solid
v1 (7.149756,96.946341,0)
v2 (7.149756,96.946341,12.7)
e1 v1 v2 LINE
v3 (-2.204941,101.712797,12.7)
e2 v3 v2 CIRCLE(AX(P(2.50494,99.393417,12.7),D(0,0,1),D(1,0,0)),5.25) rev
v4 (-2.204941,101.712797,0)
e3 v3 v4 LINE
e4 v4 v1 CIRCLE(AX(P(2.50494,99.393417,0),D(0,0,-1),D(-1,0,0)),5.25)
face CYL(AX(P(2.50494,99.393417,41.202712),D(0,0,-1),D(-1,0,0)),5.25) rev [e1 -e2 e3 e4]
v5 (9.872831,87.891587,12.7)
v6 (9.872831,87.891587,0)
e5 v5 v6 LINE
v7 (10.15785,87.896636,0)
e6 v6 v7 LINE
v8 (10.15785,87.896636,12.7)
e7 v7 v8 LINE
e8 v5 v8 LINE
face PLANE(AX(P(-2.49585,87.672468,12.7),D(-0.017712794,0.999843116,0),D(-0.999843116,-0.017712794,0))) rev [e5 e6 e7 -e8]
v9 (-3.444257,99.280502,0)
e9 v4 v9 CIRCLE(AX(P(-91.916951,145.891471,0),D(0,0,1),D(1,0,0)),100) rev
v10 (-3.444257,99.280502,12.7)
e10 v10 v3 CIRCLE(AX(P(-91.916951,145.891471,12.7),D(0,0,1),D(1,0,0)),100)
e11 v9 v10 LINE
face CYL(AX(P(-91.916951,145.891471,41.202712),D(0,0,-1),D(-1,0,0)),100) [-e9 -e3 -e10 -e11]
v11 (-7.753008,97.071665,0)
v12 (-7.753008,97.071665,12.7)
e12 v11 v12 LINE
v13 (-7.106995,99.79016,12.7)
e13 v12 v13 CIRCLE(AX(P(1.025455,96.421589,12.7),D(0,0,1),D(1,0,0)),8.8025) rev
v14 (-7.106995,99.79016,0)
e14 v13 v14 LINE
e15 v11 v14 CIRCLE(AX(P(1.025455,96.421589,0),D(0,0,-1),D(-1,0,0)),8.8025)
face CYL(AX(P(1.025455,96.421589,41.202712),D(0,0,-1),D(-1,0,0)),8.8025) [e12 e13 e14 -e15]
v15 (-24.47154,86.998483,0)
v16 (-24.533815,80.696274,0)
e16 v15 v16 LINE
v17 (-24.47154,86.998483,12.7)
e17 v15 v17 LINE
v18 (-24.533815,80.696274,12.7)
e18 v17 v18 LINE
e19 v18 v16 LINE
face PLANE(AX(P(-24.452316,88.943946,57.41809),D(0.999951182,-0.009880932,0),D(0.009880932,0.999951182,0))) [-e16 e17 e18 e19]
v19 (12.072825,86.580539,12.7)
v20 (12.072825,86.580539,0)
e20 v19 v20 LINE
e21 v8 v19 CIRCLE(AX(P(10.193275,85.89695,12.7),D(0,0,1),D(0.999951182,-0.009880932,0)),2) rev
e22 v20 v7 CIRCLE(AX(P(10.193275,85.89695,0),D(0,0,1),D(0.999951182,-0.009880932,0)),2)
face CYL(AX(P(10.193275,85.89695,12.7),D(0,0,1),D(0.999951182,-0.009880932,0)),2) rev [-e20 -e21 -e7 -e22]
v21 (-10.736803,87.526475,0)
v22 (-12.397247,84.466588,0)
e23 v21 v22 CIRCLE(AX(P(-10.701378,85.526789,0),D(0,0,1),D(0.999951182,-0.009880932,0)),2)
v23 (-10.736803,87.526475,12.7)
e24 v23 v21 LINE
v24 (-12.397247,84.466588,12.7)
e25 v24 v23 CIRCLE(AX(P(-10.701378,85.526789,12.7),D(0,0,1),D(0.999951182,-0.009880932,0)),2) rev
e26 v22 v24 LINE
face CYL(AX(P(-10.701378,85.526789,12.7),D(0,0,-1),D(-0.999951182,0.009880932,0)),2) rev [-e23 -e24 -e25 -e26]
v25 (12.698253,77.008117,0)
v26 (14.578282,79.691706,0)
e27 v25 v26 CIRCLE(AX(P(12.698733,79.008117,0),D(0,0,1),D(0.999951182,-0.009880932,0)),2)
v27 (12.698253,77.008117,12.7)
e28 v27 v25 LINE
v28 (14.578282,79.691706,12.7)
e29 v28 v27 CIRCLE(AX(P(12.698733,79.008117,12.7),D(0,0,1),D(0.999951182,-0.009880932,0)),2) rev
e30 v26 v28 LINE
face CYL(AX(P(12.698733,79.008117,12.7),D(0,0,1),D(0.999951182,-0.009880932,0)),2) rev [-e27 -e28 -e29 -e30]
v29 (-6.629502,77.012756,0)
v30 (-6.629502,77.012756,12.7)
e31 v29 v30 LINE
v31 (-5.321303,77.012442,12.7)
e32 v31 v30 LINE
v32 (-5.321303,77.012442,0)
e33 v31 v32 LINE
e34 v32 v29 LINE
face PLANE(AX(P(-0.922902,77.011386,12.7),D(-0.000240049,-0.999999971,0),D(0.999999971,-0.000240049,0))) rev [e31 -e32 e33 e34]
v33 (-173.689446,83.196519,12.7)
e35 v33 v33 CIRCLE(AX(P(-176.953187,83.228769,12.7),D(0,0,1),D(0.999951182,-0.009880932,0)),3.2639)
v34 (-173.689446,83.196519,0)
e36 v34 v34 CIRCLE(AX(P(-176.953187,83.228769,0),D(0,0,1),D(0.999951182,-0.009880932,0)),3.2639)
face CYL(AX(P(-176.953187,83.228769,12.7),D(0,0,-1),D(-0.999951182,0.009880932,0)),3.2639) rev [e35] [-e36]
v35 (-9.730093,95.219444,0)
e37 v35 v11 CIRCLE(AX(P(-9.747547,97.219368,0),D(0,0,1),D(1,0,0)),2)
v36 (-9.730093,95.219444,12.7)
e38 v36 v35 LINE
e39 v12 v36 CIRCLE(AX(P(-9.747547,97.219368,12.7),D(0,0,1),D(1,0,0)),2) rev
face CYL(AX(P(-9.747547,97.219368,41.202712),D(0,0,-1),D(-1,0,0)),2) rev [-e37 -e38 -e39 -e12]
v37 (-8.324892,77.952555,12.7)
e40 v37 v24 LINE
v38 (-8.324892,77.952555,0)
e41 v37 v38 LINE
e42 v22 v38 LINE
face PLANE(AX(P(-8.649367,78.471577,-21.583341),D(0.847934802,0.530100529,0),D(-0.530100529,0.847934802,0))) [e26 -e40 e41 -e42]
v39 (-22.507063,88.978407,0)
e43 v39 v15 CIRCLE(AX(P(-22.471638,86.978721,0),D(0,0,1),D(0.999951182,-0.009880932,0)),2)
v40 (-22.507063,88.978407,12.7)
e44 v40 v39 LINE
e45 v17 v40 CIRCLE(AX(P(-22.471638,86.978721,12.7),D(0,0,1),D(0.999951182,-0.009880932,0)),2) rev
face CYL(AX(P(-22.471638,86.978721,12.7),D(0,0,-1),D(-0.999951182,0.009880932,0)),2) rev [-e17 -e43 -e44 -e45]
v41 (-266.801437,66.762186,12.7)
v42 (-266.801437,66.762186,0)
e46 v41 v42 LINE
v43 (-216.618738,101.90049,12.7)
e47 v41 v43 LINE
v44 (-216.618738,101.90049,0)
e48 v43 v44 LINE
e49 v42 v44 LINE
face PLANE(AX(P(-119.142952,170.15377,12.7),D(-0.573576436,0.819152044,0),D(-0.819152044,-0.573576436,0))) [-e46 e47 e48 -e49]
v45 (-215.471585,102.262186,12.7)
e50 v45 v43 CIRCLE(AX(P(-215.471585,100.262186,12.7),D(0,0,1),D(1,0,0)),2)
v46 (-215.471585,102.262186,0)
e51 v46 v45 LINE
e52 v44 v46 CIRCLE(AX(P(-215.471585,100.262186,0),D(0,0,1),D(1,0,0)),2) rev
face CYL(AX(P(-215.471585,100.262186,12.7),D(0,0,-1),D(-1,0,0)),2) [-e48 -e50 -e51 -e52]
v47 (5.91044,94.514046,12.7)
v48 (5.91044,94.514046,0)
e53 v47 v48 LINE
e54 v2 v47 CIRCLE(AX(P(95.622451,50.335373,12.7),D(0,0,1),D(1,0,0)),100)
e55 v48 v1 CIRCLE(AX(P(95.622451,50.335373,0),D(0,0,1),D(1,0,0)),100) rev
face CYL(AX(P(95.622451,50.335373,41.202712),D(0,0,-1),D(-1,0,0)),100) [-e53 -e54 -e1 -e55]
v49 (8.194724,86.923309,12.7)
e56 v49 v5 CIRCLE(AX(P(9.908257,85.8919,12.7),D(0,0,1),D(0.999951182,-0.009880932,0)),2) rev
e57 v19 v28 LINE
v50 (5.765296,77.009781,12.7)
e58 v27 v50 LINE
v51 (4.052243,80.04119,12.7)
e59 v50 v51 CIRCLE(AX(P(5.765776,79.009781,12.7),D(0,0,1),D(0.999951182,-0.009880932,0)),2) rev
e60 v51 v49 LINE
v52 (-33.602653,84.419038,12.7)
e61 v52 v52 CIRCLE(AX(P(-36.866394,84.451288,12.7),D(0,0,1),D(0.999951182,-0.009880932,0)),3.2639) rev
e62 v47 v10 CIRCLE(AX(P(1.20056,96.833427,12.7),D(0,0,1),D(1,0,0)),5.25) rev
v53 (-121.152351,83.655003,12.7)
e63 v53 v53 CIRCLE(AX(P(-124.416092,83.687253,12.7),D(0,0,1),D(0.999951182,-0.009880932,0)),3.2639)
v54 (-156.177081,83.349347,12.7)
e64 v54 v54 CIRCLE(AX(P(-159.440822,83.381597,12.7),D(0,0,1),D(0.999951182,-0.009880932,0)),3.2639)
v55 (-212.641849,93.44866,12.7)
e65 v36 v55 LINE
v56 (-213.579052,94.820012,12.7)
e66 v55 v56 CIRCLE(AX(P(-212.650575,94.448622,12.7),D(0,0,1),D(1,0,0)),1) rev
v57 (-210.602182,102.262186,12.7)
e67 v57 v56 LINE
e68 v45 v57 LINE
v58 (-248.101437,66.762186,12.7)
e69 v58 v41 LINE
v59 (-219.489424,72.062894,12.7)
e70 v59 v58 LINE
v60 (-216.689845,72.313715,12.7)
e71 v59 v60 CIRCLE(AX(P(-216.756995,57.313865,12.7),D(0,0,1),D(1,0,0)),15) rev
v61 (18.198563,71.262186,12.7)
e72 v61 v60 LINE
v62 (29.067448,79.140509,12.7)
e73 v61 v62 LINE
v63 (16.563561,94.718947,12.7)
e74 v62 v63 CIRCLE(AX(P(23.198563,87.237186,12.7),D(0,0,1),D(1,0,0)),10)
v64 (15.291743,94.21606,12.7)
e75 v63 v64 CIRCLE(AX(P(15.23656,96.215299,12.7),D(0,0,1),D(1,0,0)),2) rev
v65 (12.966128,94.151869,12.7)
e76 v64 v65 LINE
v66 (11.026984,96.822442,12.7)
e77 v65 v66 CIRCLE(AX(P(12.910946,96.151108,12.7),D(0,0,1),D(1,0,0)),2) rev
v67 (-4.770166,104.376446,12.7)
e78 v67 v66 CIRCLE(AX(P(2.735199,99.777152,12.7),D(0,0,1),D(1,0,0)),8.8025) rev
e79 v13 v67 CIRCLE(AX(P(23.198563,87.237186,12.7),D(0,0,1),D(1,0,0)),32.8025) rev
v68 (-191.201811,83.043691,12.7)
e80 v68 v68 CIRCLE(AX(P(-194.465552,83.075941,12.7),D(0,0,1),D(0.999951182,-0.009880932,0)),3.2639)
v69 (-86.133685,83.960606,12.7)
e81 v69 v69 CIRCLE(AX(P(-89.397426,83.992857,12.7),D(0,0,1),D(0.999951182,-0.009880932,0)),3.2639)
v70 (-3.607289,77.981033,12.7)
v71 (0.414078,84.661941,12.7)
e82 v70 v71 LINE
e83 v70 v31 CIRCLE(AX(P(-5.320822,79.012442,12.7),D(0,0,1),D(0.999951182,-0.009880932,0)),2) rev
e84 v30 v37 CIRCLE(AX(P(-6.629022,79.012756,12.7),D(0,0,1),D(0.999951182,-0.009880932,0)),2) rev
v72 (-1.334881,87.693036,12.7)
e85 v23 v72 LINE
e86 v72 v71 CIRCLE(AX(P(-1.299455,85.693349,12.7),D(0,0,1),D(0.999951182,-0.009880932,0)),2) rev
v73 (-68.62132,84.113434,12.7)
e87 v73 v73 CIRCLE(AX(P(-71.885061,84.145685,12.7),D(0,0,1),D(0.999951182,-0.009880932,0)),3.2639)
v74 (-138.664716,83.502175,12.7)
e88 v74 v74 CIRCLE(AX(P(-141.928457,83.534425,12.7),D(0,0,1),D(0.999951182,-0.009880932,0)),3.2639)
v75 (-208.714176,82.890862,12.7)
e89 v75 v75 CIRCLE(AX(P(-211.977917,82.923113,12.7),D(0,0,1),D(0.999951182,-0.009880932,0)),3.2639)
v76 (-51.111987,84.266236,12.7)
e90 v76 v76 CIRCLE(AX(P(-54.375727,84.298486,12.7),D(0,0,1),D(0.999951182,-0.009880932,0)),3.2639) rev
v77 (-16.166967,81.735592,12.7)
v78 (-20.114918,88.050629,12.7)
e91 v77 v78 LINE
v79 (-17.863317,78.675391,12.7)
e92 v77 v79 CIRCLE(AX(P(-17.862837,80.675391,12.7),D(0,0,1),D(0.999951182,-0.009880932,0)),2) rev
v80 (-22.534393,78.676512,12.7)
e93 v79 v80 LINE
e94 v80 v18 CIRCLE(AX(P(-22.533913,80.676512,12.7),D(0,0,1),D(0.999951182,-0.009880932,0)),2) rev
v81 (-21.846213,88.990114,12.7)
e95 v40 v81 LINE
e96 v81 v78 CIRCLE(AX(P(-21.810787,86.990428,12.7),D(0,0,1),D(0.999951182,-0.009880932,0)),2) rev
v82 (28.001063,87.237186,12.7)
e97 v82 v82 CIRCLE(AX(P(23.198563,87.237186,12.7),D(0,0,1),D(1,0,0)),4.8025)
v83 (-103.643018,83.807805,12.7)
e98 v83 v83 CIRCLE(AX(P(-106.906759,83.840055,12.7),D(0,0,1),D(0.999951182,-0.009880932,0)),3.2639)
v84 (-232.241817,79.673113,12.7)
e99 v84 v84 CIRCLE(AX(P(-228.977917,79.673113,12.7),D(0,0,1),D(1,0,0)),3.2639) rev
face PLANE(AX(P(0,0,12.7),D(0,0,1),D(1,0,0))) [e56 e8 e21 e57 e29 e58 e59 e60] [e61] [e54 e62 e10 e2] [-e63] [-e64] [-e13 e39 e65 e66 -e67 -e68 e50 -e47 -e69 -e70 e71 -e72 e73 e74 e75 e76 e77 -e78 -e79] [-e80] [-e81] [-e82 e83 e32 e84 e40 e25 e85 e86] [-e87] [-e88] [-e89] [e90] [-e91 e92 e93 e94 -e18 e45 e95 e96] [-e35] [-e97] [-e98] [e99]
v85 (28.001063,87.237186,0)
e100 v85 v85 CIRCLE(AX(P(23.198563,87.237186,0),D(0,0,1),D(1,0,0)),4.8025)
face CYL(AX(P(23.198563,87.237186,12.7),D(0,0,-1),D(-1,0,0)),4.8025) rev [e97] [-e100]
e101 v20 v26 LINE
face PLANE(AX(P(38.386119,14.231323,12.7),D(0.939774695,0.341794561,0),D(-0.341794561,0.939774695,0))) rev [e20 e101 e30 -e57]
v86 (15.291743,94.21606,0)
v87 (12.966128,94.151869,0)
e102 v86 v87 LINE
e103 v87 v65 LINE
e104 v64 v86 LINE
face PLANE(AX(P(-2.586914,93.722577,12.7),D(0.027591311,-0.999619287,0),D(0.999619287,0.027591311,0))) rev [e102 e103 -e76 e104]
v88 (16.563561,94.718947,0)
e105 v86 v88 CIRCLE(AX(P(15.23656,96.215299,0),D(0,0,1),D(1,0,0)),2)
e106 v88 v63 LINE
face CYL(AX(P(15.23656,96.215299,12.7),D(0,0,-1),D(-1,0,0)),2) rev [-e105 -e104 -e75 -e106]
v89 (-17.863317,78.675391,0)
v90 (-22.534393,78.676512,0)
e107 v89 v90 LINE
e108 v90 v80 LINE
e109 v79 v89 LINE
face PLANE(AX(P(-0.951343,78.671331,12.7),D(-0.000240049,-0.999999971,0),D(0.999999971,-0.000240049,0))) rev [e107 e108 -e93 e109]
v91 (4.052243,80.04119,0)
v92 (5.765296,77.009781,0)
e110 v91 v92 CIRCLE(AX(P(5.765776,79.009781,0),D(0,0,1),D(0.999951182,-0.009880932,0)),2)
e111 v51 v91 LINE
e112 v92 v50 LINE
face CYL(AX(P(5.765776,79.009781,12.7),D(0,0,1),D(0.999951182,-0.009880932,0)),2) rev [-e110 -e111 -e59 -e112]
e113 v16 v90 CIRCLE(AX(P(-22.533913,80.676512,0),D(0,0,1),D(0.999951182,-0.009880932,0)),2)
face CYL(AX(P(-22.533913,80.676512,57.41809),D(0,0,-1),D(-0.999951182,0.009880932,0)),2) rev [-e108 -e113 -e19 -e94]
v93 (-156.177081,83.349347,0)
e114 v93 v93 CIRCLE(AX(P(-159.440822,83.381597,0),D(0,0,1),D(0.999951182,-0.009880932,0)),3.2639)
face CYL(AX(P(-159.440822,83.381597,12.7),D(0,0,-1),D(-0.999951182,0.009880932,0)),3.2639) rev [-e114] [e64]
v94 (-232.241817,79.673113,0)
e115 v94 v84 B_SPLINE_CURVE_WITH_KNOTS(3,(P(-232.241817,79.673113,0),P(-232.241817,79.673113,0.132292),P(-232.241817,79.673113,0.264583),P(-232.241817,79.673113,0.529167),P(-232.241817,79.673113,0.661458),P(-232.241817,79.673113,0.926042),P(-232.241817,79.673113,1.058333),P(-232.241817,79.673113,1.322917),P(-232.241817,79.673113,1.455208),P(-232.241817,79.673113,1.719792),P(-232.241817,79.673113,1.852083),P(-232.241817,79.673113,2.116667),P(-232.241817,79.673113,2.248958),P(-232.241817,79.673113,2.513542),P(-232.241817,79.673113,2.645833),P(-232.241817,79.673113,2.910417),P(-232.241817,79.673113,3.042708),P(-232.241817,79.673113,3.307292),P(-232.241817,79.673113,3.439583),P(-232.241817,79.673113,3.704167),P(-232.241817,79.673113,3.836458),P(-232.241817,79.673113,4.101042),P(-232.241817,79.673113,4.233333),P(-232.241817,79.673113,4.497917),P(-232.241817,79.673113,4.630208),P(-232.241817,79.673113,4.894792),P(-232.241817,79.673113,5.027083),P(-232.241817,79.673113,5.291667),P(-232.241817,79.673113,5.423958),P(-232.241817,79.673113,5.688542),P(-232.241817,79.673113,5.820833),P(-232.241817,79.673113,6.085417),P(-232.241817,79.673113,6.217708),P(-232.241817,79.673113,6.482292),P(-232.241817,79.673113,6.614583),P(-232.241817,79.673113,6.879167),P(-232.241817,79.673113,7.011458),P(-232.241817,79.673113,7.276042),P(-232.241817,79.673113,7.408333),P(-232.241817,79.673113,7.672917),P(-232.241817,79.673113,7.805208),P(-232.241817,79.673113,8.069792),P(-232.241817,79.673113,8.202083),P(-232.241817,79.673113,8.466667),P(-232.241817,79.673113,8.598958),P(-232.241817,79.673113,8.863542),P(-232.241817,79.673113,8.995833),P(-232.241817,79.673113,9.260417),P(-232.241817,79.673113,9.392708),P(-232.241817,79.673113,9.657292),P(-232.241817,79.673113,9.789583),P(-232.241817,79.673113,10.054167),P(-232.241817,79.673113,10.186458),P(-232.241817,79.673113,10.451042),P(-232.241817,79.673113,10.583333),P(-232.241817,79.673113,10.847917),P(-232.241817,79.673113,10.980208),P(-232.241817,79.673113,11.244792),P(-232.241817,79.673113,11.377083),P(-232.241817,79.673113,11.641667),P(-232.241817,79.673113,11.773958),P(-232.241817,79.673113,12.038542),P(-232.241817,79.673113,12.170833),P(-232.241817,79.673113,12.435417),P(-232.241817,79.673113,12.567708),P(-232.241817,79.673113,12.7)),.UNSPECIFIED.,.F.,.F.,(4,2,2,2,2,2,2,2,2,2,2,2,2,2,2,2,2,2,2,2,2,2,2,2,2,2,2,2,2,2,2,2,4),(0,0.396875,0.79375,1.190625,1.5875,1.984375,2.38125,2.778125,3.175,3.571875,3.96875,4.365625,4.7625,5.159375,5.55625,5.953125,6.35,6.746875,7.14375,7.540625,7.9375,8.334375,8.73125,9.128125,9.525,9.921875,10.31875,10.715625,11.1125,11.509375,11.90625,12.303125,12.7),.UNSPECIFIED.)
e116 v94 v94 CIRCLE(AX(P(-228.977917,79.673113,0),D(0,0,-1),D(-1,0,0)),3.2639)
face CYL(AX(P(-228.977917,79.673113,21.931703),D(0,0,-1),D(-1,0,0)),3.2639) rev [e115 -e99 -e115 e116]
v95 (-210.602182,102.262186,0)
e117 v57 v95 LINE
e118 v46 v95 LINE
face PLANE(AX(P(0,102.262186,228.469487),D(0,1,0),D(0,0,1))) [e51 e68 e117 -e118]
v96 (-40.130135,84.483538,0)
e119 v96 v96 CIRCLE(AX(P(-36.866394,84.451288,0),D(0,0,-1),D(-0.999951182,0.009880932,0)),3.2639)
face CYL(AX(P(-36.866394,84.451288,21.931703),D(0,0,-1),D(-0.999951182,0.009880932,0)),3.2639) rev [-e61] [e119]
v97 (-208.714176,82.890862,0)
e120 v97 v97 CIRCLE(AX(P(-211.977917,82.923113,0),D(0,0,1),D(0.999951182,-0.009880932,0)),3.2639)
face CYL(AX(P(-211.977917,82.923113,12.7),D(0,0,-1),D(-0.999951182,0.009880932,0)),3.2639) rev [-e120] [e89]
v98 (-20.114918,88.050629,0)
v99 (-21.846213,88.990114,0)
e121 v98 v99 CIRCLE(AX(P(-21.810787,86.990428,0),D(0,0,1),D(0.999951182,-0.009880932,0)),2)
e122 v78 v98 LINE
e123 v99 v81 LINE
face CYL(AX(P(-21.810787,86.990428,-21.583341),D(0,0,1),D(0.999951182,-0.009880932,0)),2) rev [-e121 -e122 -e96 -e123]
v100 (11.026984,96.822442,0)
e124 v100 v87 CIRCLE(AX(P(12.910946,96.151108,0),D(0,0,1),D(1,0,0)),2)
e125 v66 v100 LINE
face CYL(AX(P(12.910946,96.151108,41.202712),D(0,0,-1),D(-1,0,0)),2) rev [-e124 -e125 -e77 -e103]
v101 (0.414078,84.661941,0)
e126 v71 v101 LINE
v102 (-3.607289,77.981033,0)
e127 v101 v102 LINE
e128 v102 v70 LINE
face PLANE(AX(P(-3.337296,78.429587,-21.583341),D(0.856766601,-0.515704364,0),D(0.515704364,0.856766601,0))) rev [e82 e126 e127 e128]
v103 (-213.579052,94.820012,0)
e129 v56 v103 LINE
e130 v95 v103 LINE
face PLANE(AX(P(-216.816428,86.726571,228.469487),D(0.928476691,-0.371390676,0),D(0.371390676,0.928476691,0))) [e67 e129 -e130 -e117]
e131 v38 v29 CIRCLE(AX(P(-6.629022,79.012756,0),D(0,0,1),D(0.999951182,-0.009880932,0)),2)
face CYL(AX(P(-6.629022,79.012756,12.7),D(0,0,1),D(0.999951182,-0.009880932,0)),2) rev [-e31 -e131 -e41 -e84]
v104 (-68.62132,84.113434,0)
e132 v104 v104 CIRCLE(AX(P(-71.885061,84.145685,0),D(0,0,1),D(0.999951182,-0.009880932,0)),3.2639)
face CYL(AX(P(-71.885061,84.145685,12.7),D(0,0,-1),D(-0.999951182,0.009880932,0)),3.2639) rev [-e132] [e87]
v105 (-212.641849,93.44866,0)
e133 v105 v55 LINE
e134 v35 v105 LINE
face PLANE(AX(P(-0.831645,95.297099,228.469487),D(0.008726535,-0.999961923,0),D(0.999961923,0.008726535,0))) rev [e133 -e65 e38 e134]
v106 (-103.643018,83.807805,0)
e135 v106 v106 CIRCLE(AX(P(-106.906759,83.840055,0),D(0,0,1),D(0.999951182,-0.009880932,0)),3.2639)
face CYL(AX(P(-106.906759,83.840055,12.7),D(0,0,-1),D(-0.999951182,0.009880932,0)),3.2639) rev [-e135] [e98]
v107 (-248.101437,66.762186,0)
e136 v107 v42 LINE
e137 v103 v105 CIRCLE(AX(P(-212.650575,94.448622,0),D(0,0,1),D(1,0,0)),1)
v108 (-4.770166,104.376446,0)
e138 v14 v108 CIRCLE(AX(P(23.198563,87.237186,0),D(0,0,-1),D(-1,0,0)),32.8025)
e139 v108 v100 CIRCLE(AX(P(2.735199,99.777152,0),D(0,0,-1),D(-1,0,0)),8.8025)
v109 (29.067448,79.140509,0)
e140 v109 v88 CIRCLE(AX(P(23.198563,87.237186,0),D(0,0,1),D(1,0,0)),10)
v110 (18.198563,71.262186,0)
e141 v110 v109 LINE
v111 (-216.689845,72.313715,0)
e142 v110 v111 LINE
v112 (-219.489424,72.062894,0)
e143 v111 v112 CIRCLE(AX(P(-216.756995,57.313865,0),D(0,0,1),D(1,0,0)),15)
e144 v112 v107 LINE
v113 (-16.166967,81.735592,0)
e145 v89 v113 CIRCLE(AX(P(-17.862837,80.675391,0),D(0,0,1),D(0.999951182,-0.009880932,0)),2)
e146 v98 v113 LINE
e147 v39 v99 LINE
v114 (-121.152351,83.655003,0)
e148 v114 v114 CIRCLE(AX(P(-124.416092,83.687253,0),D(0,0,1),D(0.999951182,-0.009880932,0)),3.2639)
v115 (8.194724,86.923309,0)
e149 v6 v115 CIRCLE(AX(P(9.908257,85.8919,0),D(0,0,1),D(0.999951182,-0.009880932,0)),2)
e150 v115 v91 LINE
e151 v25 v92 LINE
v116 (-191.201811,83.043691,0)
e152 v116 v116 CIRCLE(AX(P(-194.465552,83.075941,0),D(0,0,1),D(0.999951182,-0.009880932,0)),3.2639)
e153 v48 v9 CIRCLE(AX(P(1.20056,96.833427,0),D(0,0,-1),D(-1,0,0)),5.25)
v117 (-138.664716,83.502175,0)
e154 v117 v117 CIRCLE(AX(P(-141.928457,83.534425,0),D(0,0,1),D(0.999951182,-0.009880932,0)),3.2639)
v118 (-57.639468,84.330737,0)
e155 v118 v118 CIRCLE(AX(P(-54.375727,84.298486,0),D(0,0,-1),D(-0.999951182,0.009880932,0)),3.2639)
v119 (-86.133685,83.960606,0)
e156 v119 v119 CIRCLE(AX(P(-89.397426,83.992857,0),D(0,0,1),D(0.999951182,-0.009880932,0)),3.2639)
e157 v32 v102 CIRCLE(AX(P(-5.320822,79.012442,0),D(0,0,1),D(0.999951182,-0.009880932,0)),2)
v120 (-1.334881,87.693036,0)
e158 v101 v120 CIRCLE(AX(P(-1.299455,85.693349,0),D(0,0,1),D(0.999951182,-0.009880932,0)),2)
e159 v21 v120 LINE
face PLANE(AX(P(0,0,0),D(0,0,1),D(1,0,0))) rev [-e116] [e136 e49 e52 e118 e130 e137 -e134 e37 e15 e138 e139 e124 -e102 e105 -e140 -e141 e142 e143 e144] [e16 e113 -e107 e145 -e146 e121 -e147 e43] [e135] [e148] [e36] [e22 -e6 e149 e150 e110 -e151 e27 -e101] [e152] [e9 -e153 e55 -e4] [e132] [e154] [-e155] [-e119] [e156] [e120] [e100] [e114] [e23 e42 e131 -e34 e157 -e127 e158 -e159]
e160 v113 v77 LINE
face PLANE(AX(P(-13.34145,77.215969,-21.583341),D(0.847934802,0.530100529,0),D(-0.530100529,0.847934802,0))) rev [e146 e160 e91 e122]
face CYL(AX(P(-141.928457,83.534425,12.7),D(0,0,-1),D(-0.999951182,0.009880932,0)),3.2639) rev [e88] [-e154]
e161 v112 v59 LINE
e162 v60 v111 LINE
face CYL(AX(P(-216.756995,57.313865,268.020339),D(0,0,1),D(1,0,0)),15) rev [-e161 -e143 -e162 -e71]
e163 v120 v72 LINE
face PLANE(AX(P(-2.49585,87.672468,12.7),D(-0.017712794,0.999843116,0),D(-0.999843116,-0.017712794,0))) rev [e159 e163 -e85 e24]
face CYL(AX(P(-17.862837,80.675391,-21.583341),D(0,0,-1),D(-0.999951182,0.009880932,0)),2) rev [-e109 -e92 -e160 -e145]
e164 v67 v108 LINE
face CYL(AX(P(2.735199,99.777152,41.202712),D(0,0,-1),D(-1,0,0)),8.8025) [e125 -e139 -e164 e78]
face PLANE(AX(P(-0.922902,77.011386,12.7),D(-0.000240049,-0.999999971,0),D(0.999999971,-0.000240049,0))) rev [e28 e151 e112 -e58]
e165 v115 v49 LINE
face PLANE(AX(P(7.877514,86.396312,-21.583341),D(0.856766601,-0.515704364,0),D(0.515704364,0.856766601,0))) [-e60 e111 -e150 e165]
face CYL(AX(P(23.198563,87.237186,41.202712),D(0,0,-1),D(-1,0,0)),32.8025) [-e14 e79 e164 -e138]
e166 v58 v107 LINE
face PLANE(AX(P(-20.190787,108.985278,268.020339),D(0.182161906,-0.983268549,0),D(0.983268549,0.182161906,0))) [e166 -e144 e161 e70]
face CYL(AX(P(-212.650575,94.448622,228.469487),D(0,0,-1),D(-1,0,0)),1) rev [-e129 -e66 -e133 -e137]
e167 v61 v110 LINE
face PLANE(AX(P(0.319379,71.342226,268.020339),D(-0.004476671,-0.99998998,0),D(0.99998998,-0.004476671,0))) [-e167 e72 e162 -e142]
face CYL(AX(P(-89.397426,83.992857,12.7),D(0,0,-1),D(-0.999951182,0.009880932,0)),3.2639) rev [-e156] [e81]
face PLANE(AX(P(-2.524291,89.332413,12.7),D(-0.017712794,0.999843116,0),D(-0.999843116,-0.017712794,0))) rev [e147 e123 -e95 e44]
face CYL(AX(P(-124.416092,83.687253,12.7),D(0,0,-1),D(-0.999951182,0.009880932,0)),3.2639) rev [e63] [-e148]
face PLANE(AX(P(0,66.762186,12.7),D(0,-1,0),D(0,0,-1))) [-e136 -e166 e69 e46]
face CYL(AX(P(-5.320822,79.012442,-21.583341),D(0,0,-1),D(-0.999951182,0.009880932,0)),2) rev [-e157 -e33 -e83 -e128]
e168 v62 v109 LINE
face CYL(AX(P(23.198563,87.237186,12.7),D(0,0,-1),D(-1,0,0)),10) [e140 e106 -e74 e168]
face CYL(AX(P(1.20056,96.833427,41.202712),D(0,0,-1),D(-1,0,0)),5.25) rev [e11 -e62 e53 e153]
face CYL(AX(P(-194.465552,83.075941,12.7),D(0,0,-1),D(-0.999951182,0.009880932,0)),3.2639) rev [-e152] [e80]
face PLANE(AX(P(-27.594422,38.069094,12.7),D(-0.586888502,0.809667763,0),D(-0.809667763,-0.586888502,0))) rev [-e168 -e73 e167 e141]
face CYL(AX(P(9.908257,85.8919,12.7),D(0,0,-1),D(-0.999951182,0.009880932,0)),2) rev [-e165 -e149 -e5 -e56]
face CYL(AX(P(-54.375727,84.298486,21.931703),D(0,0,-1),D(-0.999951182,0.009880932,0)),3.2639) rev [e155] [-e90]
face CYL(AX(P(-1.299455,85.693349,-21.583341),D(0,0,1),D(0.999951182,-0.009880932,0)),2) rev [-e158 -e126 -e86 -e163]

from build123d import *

# Parameters (mm, degrees)
SKETCH1_R           = 3.2639
SKETCH1_R_2         = 4.8025
BOSS_EXTRUDE1_DEPTH = 12.7
EXTRUDE_THIN1_DEPTH = 12.7
FILLET6_R           = 2
FILLET3_R           = 1
FILLET4_R           = 2
BOSS_EXTRUDE5_DEPTH = 12.7
CUT_EXTRUDE8_DEPTH  = 12.7
FILLET13_R          = 100
FILLET14_R          = 2
CUT_EXTRUDE9_DEPTH  = 12.7
FILLET16_R          = 2
BOSS_EXTRUDE6_DEPTH = 12.7
SKETCH18_R          = 3.2639
CUT_EXTRUDE10_DEPTH = 12.7
FILLET17_R          = 2
CUT_EXTRUDE11_DEPTH = 12.7
BOSS_EXTRUDE7_START = -12.7
BOSS_EXTRUDE7_DEPTH = 12.7
DELETEFACE1_DEPTH   = 12.7
MOVE_FACE1_DEPTH    = 12.7
MOVE_FACE1_2_DEPTH  = 12.7
MOVE_FACE2_DEPTH    = 12.7
MOVE_FACE2_2_DEPTH  = 12.7
SKETCH27_R          = 3.2639
CUT_EXTRUDE12_DEPTH = 12.7
FILLET18_R          = 15
FILLET19_R          = 1
FILLET20_R          = 2
MOVE_FACE3_DEPTH    = 12.7
MOVE_FACE3_2_DEPTH  = 12.7
FILLET21_R          = 2


# Read off the part's stored shape, not the designer's step: DeleteFace1, Move Face1, Move Face2, Move Face3
with BuildPart() as part:
    # Sketch1 → Boss-Extrude1 (new body)
    with BuildSketch(Plane.XY):
        with BuildLine():
            Line((-266.801436578, 66.762186411), (-251.101436578, 66.762186411))
            Line((-251.101436578, 66.762186411), (-241.101436578, 68.762186411))
            Line((-241.101436578, 68.762186411), (18.198563422, 71.262186411))
            Line((18.198563422, 71.262186411), (29.067448443, 79.140508783))
            ThreePointArc((29.067448443, 79.140508783), (30.773671377, 93.765412775), (16.057134994, 94.237186411))
            Line((16.057134994, 94.237186411), (-218.528848369, 87.762186411))
            Line((-218.528848369, 87.762186411), (-214.528848369, 97.762186411))
            Line((-214.528848369, 97.762186411), (-222.528848369, 97.762186411))
            Line((-222.528848369, 97.762186411), (-266.801436578, 66.762186411))
        make_face()
        with Locations((-211.801436578, 78.496276476)):
            Circle(SKETCH1_R, mode=Mode.SUBTRACT)
        with BuildLine():
            ThreePointArc((-197.554771535, 78.761405302), (-194.352166872, 82.085470554), (-191.028101621, 78.882865891))
            ThreePointArc((-191.028101621, 78.882865891), (-194.230706283, 75.55880064), (-197.554771535, 78.761405302))
        make_face(mode=Mode.SUBTRACT)
        with BuildLine():
            ThreePointArc((-180.044771535, 79.087264423), (-176.842166872, 82.411329675), (-173.518101621, 79.208725013))
            ThreePointArc((-173.518101621, 79.208725013), (-176.720706283, 75.884659761), (-180.044771535, 79.087264423))
        make_face(mode=Mode.SUBTRACT)
        with BuildLine():
            ThreePointArc((-162.534771535, 79.413123544), (-159.332166872, 82.737188796), (-156.008101621, 79.534584134))
            ThreePointArc((-156.008101621, 79.534584134), (-159.210706283, 76.210518882), (-162.534771535, 79.413123544))
        make_face(mode=Mode.SUBTRACT)
        with BuildLine():
            ThreePointArc((-145.024771535, 79.738982665), (-141.822166872, 83.063047917), (-138.498101621, 79.860443255))
            ThreePointArc((-138.498101621, 79.860443255), (-141.700706283, 76.536378003), (-145.024771535, 79.738982665))
        make_face(mode=Mode.SUBTRACT)
        with Locations((-124.251436578, 80.125572081)):
            Circle(SKETCH1_R, mode=Mode.SUBTRACT)
        with Locations((-106.744467891, 80.45137479)):
            Circle(SKETCH1_R, mode=Mode.SUBTRACT)
        with Locations((-89.237499204, 80.777177499)):
            Circle(SKETCH1_R, mode=Mode.SUBTRACT)
        with Locations((-71.727499204, 81.10303662)):
            Circle(SKETCH1_R, mode=Mode.SUBTRACT)
        with BuildLine():
            ThreePointArc((-56.754762895, 76.539814612), (-61.641816892, 81.290680691), (-56.935012167, 86.220185184))
            Line((-56.935012167, 86.220185184), (11.656299, 88.113430183))
            Line((11.656299, 88.113430183), (15.733532107, 77.238699061))
            Line((15.733532107, 77.238699061), (-56.754762895, 76.539814612))
        make_face(mode=Mode.SUBTRACT)
        with Locations((23.198563422, 87.237186411)):
            Circle(SKETCH1_R_2, mode=Mode.SUBTRACT)
    extrude(amount=BOSS_EXTRUDE1_DEPTH)

    # Sketch3 → Extrude-Thin1 (add)
    with BuildSketch(Plane.XY.offset(12.7)):
        Polygon((4.238515695, 91.06458037), (3.224088624, 89.340939538), (-3.171442721, 78.474116994), (-4.185869793, 76.750476162), (0.554142495, 73.960801716), (1.568569566, 75.684442548), (7.964100911, 86.551265092), (8.978527982, 88.274905924), align=None)
        Polygon((-7.406763076, 76.778305642), (-8.483669151, 78.463616684), (-15.08355213, 88.792145717), (-16.160458205, 90.477456759), (-20.795063569, 87.515965054), (-19.718157494, 85.830654012), (-13.118274515, 75.502124979), (-12.04136844, 73.816813937), align=None)
        Polygon((-55.789995158, 86.920345113), (-54.713089083, 85.235034072), (-48.113206103, 74.906505038), (-47.036300029, 73.221193997), (-42.401694665, 76.182685702), (-43.478600739, 77.867996743), (-50.078483719, 88.196525777), (-51.155389794, 89.881836818), align=None)
        Polygon((-30.756415894, 90.46896043), (-31.770842965, 88.745319598), (-38.16637431, 77.878497054), (-39.180801381, 76.154856222), (-34.440789094, 73.365181776), (-33.426362022, 75.088822608), (-27.030830678, 85.955645152), (-26.016403606, 87.679285984), align=None)
    extrude(amount=-EXTRUDE_THIN1_DEPTH)

    # Fillet6
    fillet6_edges = [part.edges().sort_by_distance(p)[0] for p in [
        (-7.55746183, 77.014142621, 6.35),
        (-14.193924314, 87.399916982, 6.35),
        (-38.852657232, 76.712414937, 6.35),
        (-32.865984778, 86.884534137, 6.35),
        (-32.434398171, 76.774295568, 6.35),
        (-26.378761772, 87.063593296, 6.35),
        (-49.203405679, 76.61261983, 6.35),
        (-55.370195509, 86.263376972, 6.35),
        (-42.716385675, 76.675163409, 6.35),
        (-48.956334512, 86.440411206, 6.35),
        (15.733532107, 77.238699061, 6.35),
        (11.656299, 88.113430183, 6.35),
        (-4.010566108, 77.048339456, 6.35),
        (2.350483264, 87.856572736, 6.35),
        (2.407692953, 77.110220087, 6.35),
        (8.83770627, 88.035631895, 6.35),
    ]]
    fillet(fillet6_edges, radius=FILLET6_R)

    # Fillet3
    fillet3_edges = [part.edges().sort_by_distance(p)[0] for p in [
        (-218.528848369, 87.762186411, 6.35),
    ]]
    fillet(fillet3_edges, radius=FILLET3_R)

    # Fillet4
    fillet4_edges = [part.edges().sort_by_distance(p)[0] for p in [
        (-222.528848369, 97.762186411, 6.35),
    ]]
    fillet(fillet4_edges, radius=FILLET4_R)

    # Sketch15 → Boss-Extrude5 (add)
    with BuildSketch(Plane(origin=(0, 0, 0), x_dir=(-1, 0, 0), z_dir=(0, 0, -1))):
        with BuildLine():
            ThreePointArc((-10.240564525, 95.177858348), (-9.91771052, 94.625214052), (-9.618412164, 94.059465945))
            Line((-9.618412164, 94.059465945), (-5.586658581, 93.948182209))
            ThreePointArc((-5.586658581, 93.948182209), (-6.060393003, 94.847345318), (-6.352002714, 95.820937828))
            ThreePointArc((-6.352002714, 95.820937828), (-4.888389862, 104.071201116), (2.646503395, 100.405905698))
            ThreePointArc((2.646503395, 100.405905698), (3.686135654, 98.752465403), (4.04944042, 96.833426662))
            ThreePointArc((4.04944042, 96.833426662), (3.785365476, 95.18933076), (3.019706577, 93.710630871))
            Line((3.019706577, 93.710630871), (7.309930071, 93.592212896))
            ThreePointArc((7.309930071, 93.592212896), (7.772330748, 96.70964865), (7.106994943, 99.790159701))
            ThreePointArc((7.106994943, 99.790159701), (6.028678087, 102.129209778), (4.770165569, 104.37644558))
            ThreePointArc((4.770165569, 104.37644558), (-7.334493094, 107.282517011), (-10.240564525, 95.177858348))
        make_face()
    extrude(amount=-BOSS_EXTRUDE5_DEPTH)

    # Sketch15<3> → Cut-Extrude8 (cut)
    with BuildSketch(Plane(origin=(0, 0, 0), x_dir=(-1, 0, 0), z_dir=(0, 0, -1))):
        with BuildLine():
            Line((3.019706577, 93.710630871), (-5.586658581, 93.948182209))
            ThreePointArc((-5.586658581, 93.948182209), (-1.345413965, 91.585425404), (3.019706577, 93.710630871))
        make_face()
    extrude(amount=-CUT_EXTRUDE8_DEPTH, mode=Mode.SUBTRACT)

    # Fillet13
    fillet13_edges = [part.edges().sort_by_distance(p)[0] for p in [
        (6.352002714, 95.820937828, 6.35),
        (-2.646503395, 100.405905698, 6.35),
    ]]
    fillet(fillet13_edges, radius=FILLET13_R)

    # Fillet14
    fillet14_edges = [part.edges().sort_by_distance(p)[0] for p in [
        (16.057134994, 94.237186411, 6.35),
        (-7.309930071, 93.592212896, 6.35),
        (9.618412164, 94.059465945, 6.35),
    ]]
    fillet(fillet14_edges, radius=FILLET14_R)

    # Sketch17 → Cut-Extrude9 (cut)
    with BuildSketch(Plane(origin=(0, 0, 0), x_dir=(-1, 0, 0), z_dir=(0, 0, -1))):
        Polygon((225.771163147, 83.894534568), (237.695045428, 75.54534231), (222.695045428, 75.689962442), align=None)
    extrude(amount=-CUT_EXTRUDE9_DEPTH, mode=Mode.SUBTRACT)

    # Fillet16
    fillet16_edges = [part.edges().sort_by_distance(p)[0] for p in [
        (-237.695045428, 75.54534231, 6.35),
        (-225.771163147, 83.894534568, 6.35),
        (-222.695045428, 75.689962442, 6.35),
    ]]
    fillet(fillet16_edges, radius=FILLET16_R)

    # Sketch20 → Boss-Extrude6 (add)
    with BuildSketch(Plane(origin=(0, 0, 0), x_dir=(-1, 0, 0), z_dir=(0, 0, -1))):
        Polygon((24.344481835, 87.119743124), (24.344481835, 76.852293218), (33.994868443, 72.80053303), (65.802348689, 76.852293218), (61.329456715, 89.562181047), align=None)
    extrude(amount=-BOSS_EXTRUDE6_DEPTH)

    # Sketch18 → Cut-Extrude10 (cut)
    with BuildSketch(Plane(origin=(0, 0, 0), x_dir=(-1, 0, 0), z_dir=(0, 0, -1))):
        with Locations((54.220530518, 81.428839328)):
            Circle(SKETCH18_R)
        with Locations((36.713561831, 81.754642037)):
            Circle(SKETCH18_R)
    extrude(amount=-CUT_EXTRUDE10_DEPTH, mode=Mode.SUBTRACT)

    # Fillet17
    fillet17_edges = [part.edges().sort_by_distance(p)[0] for p in [
        (-14.044481835, 76.951599042, 6.35),
        (-20.607785311, 87.222882748, 6.35),
        (-24.344481835, 76.852293218, 6.35),
        (-24.344481835, 87.119743124, 6.35),
    ]]
    fillet(fillet17_edges, radius=FILLET17_R)

    # Sketch21 → Cut-Extrude11 (cut)
    with BuildSketch(Plane(origin=(0, 0, 0), x_dir=(-1, 0, 0), z_dir=(0, 0, -1))):
        Polygon((-18.198563422, 71.262186411), (237.097520463, 68.800789536), (218.101436578, 72.320034463), align=None)
    extrude(amount=-CUT_EXTRUDE11_DEPTH, mode=Mode.SUBTRACT)

    # Sketch23 → Boss-Extrude7 (add)
    with BuildSketch(Plane(origin=(0, 0, 0), x_dir=(-1, 0, 0), z_dir=(0, 0, -1)).offset(BOSS_EXTRUDE7_START)):
        with BuildLine():
            Line((214.132797507, 93.43564849), (7.760879339, 95.236628935))
            ThreePointArc((7.760879339, 95.236628935), (8.411151209, 94.031058955), (9.684666066, 93.526665861))
            Line((9.684666066, 93.526665861), (217.007580476, 87.804176173))
            ThreePointArc((217.007580476, 87.804176173), (217.855425222, 88.231795195), (217.963648478, 89.175186136))
            Line((217.963648478, 89.175186136), (214.528848369, 97.762186411))
            Line((214.528848369, 97.762186411), (221.898250791, 97.762186411))
            ThreePointArc((221.898250791, 97.762186411), (222.49966239, 97.669620312), (223.045403664, 97.400490499))
            Line((223.045403664, 97.400490499), (216.102182338, 102.262186411))
            Line((216.102182338, 102.262186411), (210.602182338, 102.262186411))
            Line((210.602182338, 102.262186411), (214.132797507, 93.43564849))
        make_face()
        Polygon((241.101436578, 68.762186411), (251.101436578, 66.762186411), (248.101436578, 66.762186411), (237.097520463, 68.800789536), align=None)
    extrude(amount=BOSS_EXTRUDE7_DEPTH)

    # DeleteFace1 outline → DeleteFace1 (add)
    with BuildSketch(Plane.XY):
        with BuildLine():
            ThreePointArc((-232.41031363, 79.245751353), (-233.167673391, 76.996847862), (-231.24387897, 75.607540213))
            Line((-231.24387897, 75.607540213), (-225.551208697, 75.662425195))
            ThreePointArc((-225.551208697, 75.662425195), (-223.921202956, 76.531027402), (-223.697787346, 78.364459696))
            Line((-223.697787346, 78.364459696), (-224.86520894, 81.478187952))
            ThreePointArc((-224.86520894, 81.478187952), (-226.145702257, 82.686371348), (-227.88506495, 82.414364591))
            Line((-227.88506495, 82.414364591), (-232.41031363, 79.245751353))
        make_face()
    extrude(amount=DELETEFACE1_DEPTH)

    # Move Face1 outline → Move Face1 (cut)
    with BuildSketch(Plane.XY):
        with BuildLine():
            ThreePointArc((-24.50537332, 79.036329201), (-24.314016139, 78.162656149), (-23.76098511, 77.45974872))
            ThreePointArc((-23.76098511, 77.45974872), (-24.192860388, 78.107799283), (-24.344481835, 78.871668856))
            Line((-24.344481835, 78.871668856), (-24.344481835, 85.174185048))
            ThreePointArc((-24.344481835, 85.174185048), (-23.778072649, 86.568752141), (-22.399664457, 87.173423623))
            Line((-22.399664457, 87.173423623), (-21.73896166, 87.191660222))
            ThreePointArc((-21.73896166, 87.191660222), (-20.831207894, 87.001598932), (-20.106786806, 86.422501117))
            ThreePointArc((-20.106786806, 86.422501117), (-20.845075734, 87.097267125), (-21.817771072, 87.330169438))
            Line((-21.817771072, 87.330169438), (-22.47862181, 87.318462088))
            ThreePointArc((-22.47862181, 87.318462088), (-23.862937429, 86.727440083), (-24.443098586, 85.33853772))
            Line((-24.443098586, 85.33853772), (-24.50537332, 79.036329201))
        make_face()
        with BuildLine():
            ThreePointArc((-8.324891511, 77.952555147), (-7.598664142, 77.263529538), (-6.629502006, 77.012756264))
            Line((-6.629502006, 77.012756264), (-5.321302588, 77.012442231))
            ThreePointArc((-5.321302588, 77.012442231), (-5.126611216, 77.021894012), (-4.933764563, 77.050253049))
            ThreePointArc((-4.933764563, 77.050253049), (-5.037390445, 77.041144937), (-5.141349734, 77.037437184))
            Line((-5.141349734, 77.037437184), (-6.449488392, 77.024824972))
            ThreePointArc((-6.449488392, 77.024824972), (-7.42108109, 77.266009779), (-8.154081221, 77.947825948))
            Line((-8.154081221, 77.947825948), (-12.290602901, 84.421301978))
            ThreePointArc((-12.290602901, 84.421301978), (-12.372491912, 86.434692957), (-10.660474482, 87.497446627))
            Line((-10.660474482, 87.497446627), (-7.587445764, 87.582267811))
            Line((-7.587445764, 87.582267811), (-10.736803264, 87.526475137))
            ThreePointArc((-10.736803264, 87.526475137), (-12.459238114, 86.480689676), (-12.39724728, 84.466587846))
            Line((-12.39724728, 84.466587846), (-8.324891511, 77.952555147))
        make_face()
        with BuildLine():
            ThreePointArc((4.052243065, 80.041189569), (4.024564038, 78.025819476), (5.765296169, 77.0097809))
            Line((5.765296169, 77.0097809), (12.698252915, 77.008116648))
            ThreePointArc((12.698252915, 77.008116648), (13.630682373, 77.238520481), (14.348178535, 77.877042115))
            ThreePointArc((14.348178535, 77.877042115), (13.68295132, 77.389092208), (12.877368838, 77.211161813))
            Line((12.877368838, 77.211161813), (5.944734099, 77.14432191))
            ThreePointArc((5.944734099, 77.14432191), (4.194047538, 78.14311083), (4.201811479, 80.158656033))
            Line((4.201811479, 80.158656033), (7.670211631, 86.051909765))
            Line((7.670211631, 86.051909765), (4.052243065, 80.041189569))
        make_face()
        with BuildLine():
            ThreePointArc((-208.785112786, 79.743206302), (-212.207698907, 83.767453494), (-214.973209883, 79.266274731))
            ThreePointArc((-214.973209883, 79.266274731), (-212.052249394, 81.750525413), (-208.785112786, 79.743206302))
        make_face()
        with BuildLine():
            ThreePointArc((-103.621952617, 81.401607168), (-107.351955287, 84.660576236), (-110.008243114, 80.479914293))
            ThreePointArc((-110.008243114, 80.479914293), (-107.210695338, 83.681804355), (-103.621952617, 81.401607168))
        make_face()
        with BuildLine():
            ThreePointArc((-92.498078721, 80.6299891), (-89.791939616, 83.993641247), (-86.11581505, 81.730136708))
            ThreePointArc((-86.11581505, 81.730136708), (-89.930834979, 84.799412057), (-92.498078721, 80.6299891))
        make_face()
        with BuildLine():
            ThreePointArc((-74.970511489, 80.734370741), (-72.415927954, 84.293508226), (-68.621017286, 82.104442284))
            ThreePointArc((-68.621017286, 82.104442284), (-72.552458321, 84.926248011), (-74.970511489, 80.734370741))
        make_face()
        with BuildLine():
            ThreePointArc((-191.248663435, 80.003056766), (-194.714568399, 83.918741932), (-197.487294238, 79.485111483))
            ThreePointArc((-197.487294238, 79.485111483), (-194.561483882, 82.074844877), (-191.248663435, 80.003056766))
        make_face()
        with BuildLine():
            ThreePointArc((-173.715281989, 80.26680625), (-177.225383788, 84.069562322), (-179.998310688, 79.700049215))
            ThreePointArc((-179.998310688, 79.700049215), (-177.074664267, 82.398696293), (-173.715281989, 80.26680625))
        make_face()
        with BuildLine():
            ThreePointArc((-156.185127552, 80.535804782), (-159.741493142, 84.21969608), (-162.50610013, 79.9097379))
            ThreePointArc((-162.50610013, 79.9097379), (-159.593138616, 82.721861076), (-156.185127552, 80.535804782))
        make_face()
        with BuildLine():
            ThreePointArc((-138.658513403, 80.812091832), (-142.264934226, 84.368778203), (-145.010349283, 80.112138066))
            ThreePointArc((-145.010349283, 80.112138066), (-142.118944696, 83.043974225), (-138.658513403, 80.812091832))
        make_face()
        with BuildLine():
            ThreePointArc((-121.136042829, 81.098898849), (-124.798937068, 84.516160777), (-127.510454861, 80.304018265))
            ThreePointArc((-127.510454861, 80.304018265), (-124.655312534, 83.364387825), (-121.136042829, 81.098898849))
        make_face()
        with BuildLine():
            ThreePointArc((-39.741602066, 80.536440271), (-38.076726294, 84.720249202), (-33.81732279, 83.259581446))
            ThreePointArc((-33.81732279, 83.259581446), (-38.208527488, 85.006986845), (-39.741602066, 80.536440271))
        make_face()
        with BuildLine():
            ThreePointArc((-57.412375767, 80.746807718), (-55.134895592, 84.562045309), (-51.162851049, 82.570609653))
            ThreePointArc((-51.162851049, 82.570609653), (-55.269061372, 85.021784024), (-57.412375767, 80.746807718))
        make_face()
    extrude(amount=MOVE_FACE1_DEPTH, mode=Mode.SUBTRACT)

    # Move Face1 2 outline → Move Face1 2 (add)
    with BuildSketch(Plane.XY):
        with BuildLine():
            Line((-17.834875183, 77.015446106), (-22.505951054, 77.016567395))
            ThreePointArc((-22.505951054, 77.016567395), (-23.171416008, 77.13069428), (-23.76098511, 77.45974872))
            ThreePointArc((-23.76098511, 77.45974872), (-23.102432443, 77.020855285), (-22.325200047, 76.871761805))
            Line((-22.325200047, 76.871761805), (-17.654341127, 76.916795154))
            ThreePointArc((-17.654341127, 76.916795154), (-15.914900671, 77.964391295), (-15.988311874, 79.993608279))
            Line((-15.988311874, 79.993608279), (-19.998467996, 86.269327722))
            ThreePointArc((-19.998467996, 86.269327722), (-20.050830421, 86.34718518), (-20.106786806, 86.422501117))
            ThreePointArc((-20.106786806, 86.422501117), (-20.096556278, 86.406640609), (-20.086475879, 86.390684265))
            Line((-20.086475879, 86.390684265), (-16.13852548, 80.075647108))
            ThreePointArc((-16.13852548, 80.075647108), (-16.085168416, 78.045803814), (-17.834875183, 77.015446106))
        make_face()
        with BuildLine():
            ThreePointArc((-3.607289287, 77.981033446), (-4.172036691, 77.375282685), (-4.933764563, 77.050253049))
            ThreePointArc((-4.933764563, 77.050253049), (-4.070842996, 77.360334703), (-3.436990691, 78.022917164))
            Line((-3.436990691, 78.022917164), (0.51816646, 84.743233048))
            ThreePointArc((0.51816646, 84.743233048), (0.516873837, 86.774280326), (-1.260656995, 87.756898694))
            Line((-1.260656995, 87.756898694), (-7.587445764, 87.582267811))
            Line((-7.587445764, 87.582267811), (-1.334881025, 87.693035582))
            ThreePointArc((-1.334881025, 87.693035582), (0.432853847, 86.692901522), (0.414077766, 84.661940622))
            Line((0.414077766, 84.661940622), (-3.607289287, 77.981033446))
        make_face()
        with BuildLine():
            ThreePointArc((14.578282404, 79.691705712), (14.682845476, 78.756526183), (14.348178535, 77.877042115))
            ThreePointArc((14.348178535, 77.877042115), (14.823685661, 78.84171524), (14.730790188, 79.913196315))
            Line((14.730790188, 79.913196315), (12.157386783, 86.776936838))
            ThreePointArc((12.157386783, 86.776936838), (11.401137641, 87.734185921), (10.229501023, 88.074047963))
            Line((10.229501023, 88.074047963), (9.944546379, 88.066182696))
            ThreePointArc((9.944546379, 88.066182696), (8.983108795, 87.789292331), (8.27608817, 87.081371193))
            Line((8.27608817, 87.081371193), (7.670211631, 86.051909765))
            Line((7.670211631, 86.051909765), (8.194723737, 86.923309129))
            ThreePointArc((8.194723737, 86.923309129), (8.908704768, 87.624209685), (9.872831352, 87.891586634))
            Line((9.872831352, 87.891586634), (10.1578498, 87.896635899))
            ThreePointArc((10.1578498, 87.896635899), (11.326071068, 87.545213586), (12.07282478, 86.580538788))
            Line((12.07282478, 86.580538788), (14.578282404, 79.691705712))
        make_face()
        with BuildLine():
            ThreePointArc((-208.785112786, 79.743206302), (-211.706073275, 77.25895562), (-214.973209883, 79.266274731))
            ThreePointArc((-214.973209883, 79.266274731), (-211.550623762, 75.242027539), (-208.785112786, 79.743206302))
        make_face()
        with BuildLine():
            ThreePointArc((-103.621952617, 81.401607168), (-106.419500393, 78.199717106), (-110.008243114, 80.479914293))
            ThreePointArc((-110.008243114, 80.479914293), (-106.278240444, 77.220945225), (-103.621952617, 81.401607168))
        make_face()
        with BuildLine():
            ThreePointArc((-86.11581505, 81.730136708), (-88.821954155, 78.366484561), (-92.498078721, 80.6299891))
            ThreePointArc((-92.498078721, 80.6299891), (-88.683058792, 77.560713751), (-86.11581505, 81.730136708))
        make_face()
        with BuildLine():
            ThreePointArc((-68.621017286, 82.104442284), (-71.175600821, 78.545304799), (-74.970511489, 80.734370741))
            ThreePointArc((-74.970511489, 80.734370741), (-71.039070454, 77.912565014), (-68.621017286, 82.104442284))
        make_face()
        with BuildLine():
            ThreePointArc((-191.248663435, 80.003056766), (-194.174473791, 77.413323372), (-197.487294238, 79.485111483))
            ThreePointArc((-197.487294238, 79.485111483), (-194.021389274, 75.569426317), (-191.248663435, 80.003056766))
        make_face()
        with BuildLine():
            ThreePointArc((-173.715281989, 80.26680625), (-176.63892841, 77.568159172), (-179.998310688, 79.700049215))
            ThreePointArc((-179.998310688, 79.700049215), (-176.488208889, 75.897293143), (-173.715281989, 80.26680625))
        make_face()
        with BuildLine():
            ThreePointArc((-156.185127552, 80.535804782), (-159.098089066, 77.723681606), (-162.50610013, 79.9097379))
            ThreePointArc((-162.50610013, 79.9097379), (-158.94973454, 76.225846602), (-156.185127552, 80.535804782))
        make_face()
        with BuildLine():
            ThreePointArc((-138.658513403, 80.812091832), (-141.54991799, 77.880255673), (-145.010349283, 80.112138066))
            ThreePointArc((-145.010349283, 80.112138066), (-141.40392846, 76.555451695), (-138.658513403, 80.812091832))
        make_face()
        with BuildLine():
            ThreePointArc((-121.136042829, 81.098898849), (-123.991185156, 78.038529289), (-127.510454861, 80.304018265))
            ThreePointArc((-127.510454861, 80.304018265), (-123.847560622, 76.886756337), (-121.136042829, 81.098898849))
        make_face()
        with BuildLine():
            ThreePointArc((-33.81732279, 83.259581446), (-35.482198562, 79.075772515), (-39.741602066, 80.536440271))
            ThreePointArc((-39.741602066, 80.536440271), (-35.350397368, 78.789034872), (-33.81732279, 83.259581446))
        make_face()
        with BuildLine():
            ThreePointArc((-51.162851049, 82.570609653), (-53.440331224, 78.755372062), (-57.412375767, 80.746807718))
            ThreePointArc((-57.412375767, 80.746807718), (-53.306165444, 78.295633347), (-51.162851049, 82.570609653))
        make_face()
    extrude(amount=MOVE_FACE1_2_DEPTH)

    # Move Face2 outline → Move Face2 (cut)
    with BuildSketch(Plane.XY):
        with BuildLine():
            ThreePointArc((-24.52640427, 81.446237436), (-24.517255088, 81.234377245), (-24.485725635, 81.024676646))
            Line((-24.485725635, 81.024676646), (-24.443098586, 85.33853772))
            ThreePointArc((-24.443098586, 85.33853772), (-23.862937429, 86.727440083), (-22.47862181, 87.318462088))
            Line((-22.47862181, 87.318462088), (-21.817771072, 87.330169438))
            ThreePointArc((-21.817771072, 87.330169438), (-20.828444713, 87.088343644), (-20.086475879, 86.390684265))
            Line((-20.086475879, 86.390684265), (-16.242777815, 80.242406389))
            ThreePointArc((-16.242777815, 80.242406389), (-15.856801043, 81.351204798), (-16.15955643, 82.485555342))
            Line((-16.15955643, 82.485555342), (-20.10750683, 88.800592499))
            ThreePointArc((-20.10750683, 88.800592499), (-20.849475663, 89.498251878), (-21.838802022, 89.740077673))
            Line((-21.838802022, 89.740077673), (-22.499652761, 89.728370323))
            ThreePointArc((-22.499652761, 89.728370323), (-23.88396838, 89.137348317), (-24.464129537, 87.748445954))
            Line((-24.464129537, 87.748445954), (-24.52640427, 81.446237436))
        make_face()
        with BuildLine():
            ThreePointArc((-208.934199045, 81.744629031), (-212.006399579, 86.186888512), (-215.000604087, 81.691688317))
            ThreePointArc((-215.000604087, 81.691688317), (-211.985368629, 83.776980278), (-208.934199045, 81.744629031))
        make_face()
        with BuildLine():
            ThreePointArc((-103.863040795, 82.661571145), (-106.935241328, 87.103830627), (-109.929445835, 82.608630432))
            ThreePointArc((-109.929445835, 82.608630432), (-106.914210378, 84.693922392), (-103.863040795, 82.661571145))
        make_face()
        with BuildLine():
            ThreePointArc((-86.353707522, 82.814372783), (-89.425908055, 87.256632265), (-92.420112562, 82.76143207))
            ThreePointArc((-92.420112562, 82.76143207), (-89.404877105, 84.84672403), (-86.353707522, 82.814372783))
        make_face()
        with BuildLine():
            ThreePointArc((-68.841342526, 82.96720088), (-71.913543062, 87.40946036), (-74.907747567, 82.914260164))
            ThreePointArc((-74.907747567, 82.914260164), (-71.892512111, 84.999552126), (-68.841342526, 82.96720088))
        make_face()
        with BuildLine():
            ThreePointArc((-191.42183405, 81.897457126), (-194.494034583, 86.339716608), (-197.48823909, 81.844516413))
            ThreePointArc((-197.48823909, 81.844516413), (-194.473003633, 83.929808373), (-191.42183405, 81.897457126))
        make_face()
        with BuildLine():
            ThreePointArc((-173.909469054, 82.050285222), (-176.98166959, 86.492544703), (-179.975874095, 81.997344507))
            ThreePointArc((-179.975874095, 81.997344507), (-176.960638639, 84.082636468), (-173.909469054, 82.050285222))
        make_face()
        with BuildLine():
            ThreePointArc((-156.397104058, 82.203113317), (-159.469304592, 86.645372798), (-162.4635091, 82.150172603))
            ThreePointArc((-162.4635091, 82.150172603), (-159.448273642, 84.235464564), (-156.397104058, 82.203113317))
        make_face()
        with BuildLine():
            ThreePointArc((-138.884739063, 82.355941413), (-141.956939599, 86.798200894), (-144.951144104, 82.303000698))
            ThreePointArc((-144.951144104, 82.303000698), (-141.935908648, 84.388292659), (-138.884739063, 82.355941413))
        make_face()
        with BuildLine():
            ThreePointArc((-121.372374067, 82.508769508), (-124.444574603, 86.951028989), (-127.438779108, 82.455828793))
            ThreePointArc((-127.438779108, 82.455828793), (-124.423543652, 84.541120754), (-121.372374067, 82.508769508))
        make_face()
        with BuildLine():
            ThreePointArc((-33.82267598, 83.272804155), (-36.894876516, 87.715063636), (-39.889081021, 83.21986344))
            ThreePointArc((-39.889081021, 83.21986344), (-36.873845565, 85.305155401), (-33.82267598, 83.272804155))
        make_face()
        with BuildLine():
            ThreePointArc((-51.332009253, 83.120002518), (-54.404209789, 87.562261998), (-57.398414294, 83.067061802))
            ThreePointArc((-57.398414294, 83.067061802), (-54.383178838, 85.152353764), (-51.332009253, 83.120002518))
        make_face()
    extrude(amount=MOVE_FACE2_DEPTH, mode=Mode.SUBTRACT)

    # Move Face2 2 outline → Move Face2 2 (add)
    with BuildSketch(Plane.XY):
        with BuildLine():
            Line((-17.855906133, 79.425354341), (-22.526982004, 79.42647563))
            ThreePointArc((-22.526982004, 79.42647563), (-23.790887683, 79.876853488), (-24.485725635, 81.024676646))
            Line((-24.485725635, 81.024676646), (-24.50537332, 79.036329201))
            ThreePointArc((-24.50537332, 79.036329201), (-23.926823107, 77.609528581), (-22.505951054, 77.016567395))
            Line((-22.505951054, 77.016567395), (-17.834875183, 77.015446106))
            ThreePointArc((-17.834875183, 77.015446106), (-16.085168416, 78.045803814), (-16.13852548, 80.075647108))
            Line((-16.13852548, 80.075647108), (-16.242777815, 80.242406389))
            ThreePointArc((-16.242777815, 80.242406389), (-16.951730829, 79.641163997), (-17.855906133, 79.425354341))
        make_face()
        with BuildLine():
            ThreePointArc((-208.934199045, 81.744629031), (-211.949434503, 79.65933707), (-215.000604087, 81.691688317))
            ThreePointArc((-215.000604087, 81.691688317), (-211.928403553, 77.249428836), (-208.934199045, 81.744629031))
        make_face()
        with BuildLine():
            ThreePointArc((-103.863040795, 82.661571145), (-106.878276252, 80.576279185), (-109.929445835, 82.608630432))
            ThreePointArc((-109.929445835, 82.608630432), (-106.857245302, 78.16637095), (-103.863040795, 82.661571145))
        make_face()
        with BuildLine():
            ThreePointArc((-86.353707522, 82.814372783), (-89.368942979, 80.729080823), (-92.420112562, 82.76143207))
            ThreePointArc((-92.420112562, 82.76143207), (-89.347912029, 78.319172588), (-86.353707522, 82.814372783))
        make_face()
        with BuildLine():
            ThreePointArc((-68.841342526, 82.96720088), (-71.856577982, 80.881908918), (-74.907747567, 82.914260164))
            ThreePointArc((-74.907747567, 82.914260164), (-71.835547031, 78.472000684), (-68.841342526, 82.96720088))
        make_face()
        with BuildLine():
            ThreePointArc((-191.42183405, 81.897457126), (-194.437069507, 79.812165166), (-197.48823909, 81.844516413))
            ThreePointArc((-197.48823909, 81.844516413), (-194.416038557, 77.402256931), (-191.42183405, 81.897457126))
        make_face()
        with BuildLine():
            ThreePointArc((-173.909469054, 82.050285222), (-176.92470451, 79.964993261), (-179.975874095, 81.997344507))
            ThreePointArc((-179.975874095, 81.997344507), (-176.903673559, 77.555085026), (-173.909469054, 82.050285222))
        make_face()
        with BuildLine():
            ThreePointArc((-156.397104058, 82.203113317), (-159.412339516, 80.117821356), (-162.4635091, 82.150172603))
            ThreePointArc((-162.4635091, 82.150172603), (-159.391308566, 77.707913122), (-156.397104058, 82.203113317))
        make_face()
        with BuildLine():
            ThreePointArc((-138.884739063, 82.355941413), (-141.899974519, 80.270649452), (-144.951144104, 82.303000698))
            ThreePointArc((-144.951144104, 82.303000698), (-141.878943568, 77.860741217), (-138.884739063, 82.355941413))
        make_face()
        with BuildLine():
            ThreePointArc((-121.372374067, 82.508769508), (-124.387609523, 80.423477547), (-127.438779108, 82.455828793))
            ThreePointArc((-127.438779108, 82.455828793), (-124.366578572, 78.013569312), (-121.372374067, 82.508769508))
        make_face()
        with BuildLine():
            ThreePointArc((-33.82267598, 83.272804155), (-36.837911436, 81.187512194), (-39.889081021, 83.21986344))
            ThreePointArc((-39.889081021, 83.21986344), (-36.816880485, 78.777603959), (-33.82267598, 83.272804155))
        make_face()
        with BuildLine():
            ThreePointArc((-51.332009253, 83.120002518), (-54.347244709, 81.034710556), (-57.398414294, 83.067061802))
            ThreePointArc((-57.398414294, 83.067061802), (-54.326213758, 78.624802322), (-51.332009253, 83.120002518))
        make_face()
    extrude(amount=MOVE_FACE2_2_DEPTH)

    # Sketch27 → Cut-Extrude12 (cut)
    with BuildSketch(Plane(origin=(0, 0, 0), x_dir=(-1, 0, 0), z_dir=(0, 0, -1))):
        with Locations((228.977917041, 79.673112791)):
            Circle(SKETCH27_R)
    extrude(amount=-CUT_EXTRUDE12_DEPTH, mode=Mode.SUBTRACT)

    # Fillet18
    fillet18_edges = [part.edges().sort_by_distance(p)[0] for p in [
        (-218.101436578, 72.320034463, 6.35),
    ]]
    fillet(fillet18_edges, radius=FILLET18_R)

    # Fillet19
    fillet19_edges = [part.edges().sort_by_distance(p)[0] for p in [
        (-214.132797507, 93.43564849, 6.35),
    ]]
    fillet(fillet19_edges, radius=FILLET19_R)

    # Fillet20
    fillet20_edges = [part.edges().sort_by_distance(p)[0] for p in [
        (-216.102182338, 102.262186411, 6.35),
    ]]
    fillet(fillet20_edges, radius=FILLET20_R)

    # Move Face3 outline → Move Face3 (cut)
    with BuildSketch(Plane.XY):
        with BuildLine():
            ThreePointArc((-24.533814969, 80.696274049), (-23.955264756, 79.269473429), (-22.534392703, 78.676512243))
            Line((-22.534392703, 78.676512243), (-17.863316832, 78.675390954))
            ThreePointArc((-17.863316832, 78.675390954), (-16.328203926, 79.39285351), (-15.894698081, 81.03096121))
            ThreePointArc((-15.894698081, 81.03096121), (-16.588486309, 79.877819555), (-17.855906133, 79.425354341))
            Line((-17.855906133, 79.425354341), (-22.526982004, 79.42647563))
            ThreePointArc((-22.526982004, 79.42647563), (-23.947854057, 80.019436816), (-24.52640427, 81.446237436))
            Line((-24.52640427, 81.446237436), (-24.533814969, 80.696274049))
        make_face()
    extrude(amount=MOVE_FACE3_DEPTH, mode=Mode.SUBTRACT)

    # Move Face3 2 outline → Move Face3 2 (add)
    with BuildSketch(Plane.XY):
        with BuildLine():
            ThreePointArc((-16.166967129, 81.735591955), (-15.997263029, 81.396247854), (-15.894698081, 81.03096121))
            ThreePointArc((-15.894698081, 81.03096121), (-15.887778341, 81.783631487), (-16.15955643, 82.485555342))
            Line((-16.15955643, 82.485555342), (-20.10750683, 88.800592499))
            ThreePointArc((-20.10750683, 88.800592499), (-20.849475663, 89.498251878), (-21.838802022, 89.740077673))
            Line((-21.838802022, 89.740077673), (-22.499652761, 89.728370323))
            ThreePointArc((-22.499652761, 89.728370323), (-23.88396838, 89.137348317), (-24.464129537, 87.748445954))
            Line((-24.464129537, 87.748445954), (-24.471540236, 86.998482568))
            ThreePointArc((-24.471540236, 86.998482568), (-23.891379078, 88.387384931), (-22.507063459, 88.978406936))
            Line((-22.507063459, 88.978406936), (-21.846212721, 88.990114286))
            ThreePointArc((-21.846212721, 88.990114286), (-20.856886362, 88.748288492), (-20.114917528, 88.050629113))
            Line((-20.114917528, 88.050629113), (-16.166967129, 81.735591955))
        make_face()
    extrude(amount=MOVE_FACE3_2_DEPTH)

    # Fillet21
    fillet21_edges = [part.edges().sort_by_distance(p)[0] for p in [
        (-7.760879339, 95.236628935, 6.35),
    ]]
    fillet(fillet21_edges, radius=FILLET21_R)


solid = part.part
